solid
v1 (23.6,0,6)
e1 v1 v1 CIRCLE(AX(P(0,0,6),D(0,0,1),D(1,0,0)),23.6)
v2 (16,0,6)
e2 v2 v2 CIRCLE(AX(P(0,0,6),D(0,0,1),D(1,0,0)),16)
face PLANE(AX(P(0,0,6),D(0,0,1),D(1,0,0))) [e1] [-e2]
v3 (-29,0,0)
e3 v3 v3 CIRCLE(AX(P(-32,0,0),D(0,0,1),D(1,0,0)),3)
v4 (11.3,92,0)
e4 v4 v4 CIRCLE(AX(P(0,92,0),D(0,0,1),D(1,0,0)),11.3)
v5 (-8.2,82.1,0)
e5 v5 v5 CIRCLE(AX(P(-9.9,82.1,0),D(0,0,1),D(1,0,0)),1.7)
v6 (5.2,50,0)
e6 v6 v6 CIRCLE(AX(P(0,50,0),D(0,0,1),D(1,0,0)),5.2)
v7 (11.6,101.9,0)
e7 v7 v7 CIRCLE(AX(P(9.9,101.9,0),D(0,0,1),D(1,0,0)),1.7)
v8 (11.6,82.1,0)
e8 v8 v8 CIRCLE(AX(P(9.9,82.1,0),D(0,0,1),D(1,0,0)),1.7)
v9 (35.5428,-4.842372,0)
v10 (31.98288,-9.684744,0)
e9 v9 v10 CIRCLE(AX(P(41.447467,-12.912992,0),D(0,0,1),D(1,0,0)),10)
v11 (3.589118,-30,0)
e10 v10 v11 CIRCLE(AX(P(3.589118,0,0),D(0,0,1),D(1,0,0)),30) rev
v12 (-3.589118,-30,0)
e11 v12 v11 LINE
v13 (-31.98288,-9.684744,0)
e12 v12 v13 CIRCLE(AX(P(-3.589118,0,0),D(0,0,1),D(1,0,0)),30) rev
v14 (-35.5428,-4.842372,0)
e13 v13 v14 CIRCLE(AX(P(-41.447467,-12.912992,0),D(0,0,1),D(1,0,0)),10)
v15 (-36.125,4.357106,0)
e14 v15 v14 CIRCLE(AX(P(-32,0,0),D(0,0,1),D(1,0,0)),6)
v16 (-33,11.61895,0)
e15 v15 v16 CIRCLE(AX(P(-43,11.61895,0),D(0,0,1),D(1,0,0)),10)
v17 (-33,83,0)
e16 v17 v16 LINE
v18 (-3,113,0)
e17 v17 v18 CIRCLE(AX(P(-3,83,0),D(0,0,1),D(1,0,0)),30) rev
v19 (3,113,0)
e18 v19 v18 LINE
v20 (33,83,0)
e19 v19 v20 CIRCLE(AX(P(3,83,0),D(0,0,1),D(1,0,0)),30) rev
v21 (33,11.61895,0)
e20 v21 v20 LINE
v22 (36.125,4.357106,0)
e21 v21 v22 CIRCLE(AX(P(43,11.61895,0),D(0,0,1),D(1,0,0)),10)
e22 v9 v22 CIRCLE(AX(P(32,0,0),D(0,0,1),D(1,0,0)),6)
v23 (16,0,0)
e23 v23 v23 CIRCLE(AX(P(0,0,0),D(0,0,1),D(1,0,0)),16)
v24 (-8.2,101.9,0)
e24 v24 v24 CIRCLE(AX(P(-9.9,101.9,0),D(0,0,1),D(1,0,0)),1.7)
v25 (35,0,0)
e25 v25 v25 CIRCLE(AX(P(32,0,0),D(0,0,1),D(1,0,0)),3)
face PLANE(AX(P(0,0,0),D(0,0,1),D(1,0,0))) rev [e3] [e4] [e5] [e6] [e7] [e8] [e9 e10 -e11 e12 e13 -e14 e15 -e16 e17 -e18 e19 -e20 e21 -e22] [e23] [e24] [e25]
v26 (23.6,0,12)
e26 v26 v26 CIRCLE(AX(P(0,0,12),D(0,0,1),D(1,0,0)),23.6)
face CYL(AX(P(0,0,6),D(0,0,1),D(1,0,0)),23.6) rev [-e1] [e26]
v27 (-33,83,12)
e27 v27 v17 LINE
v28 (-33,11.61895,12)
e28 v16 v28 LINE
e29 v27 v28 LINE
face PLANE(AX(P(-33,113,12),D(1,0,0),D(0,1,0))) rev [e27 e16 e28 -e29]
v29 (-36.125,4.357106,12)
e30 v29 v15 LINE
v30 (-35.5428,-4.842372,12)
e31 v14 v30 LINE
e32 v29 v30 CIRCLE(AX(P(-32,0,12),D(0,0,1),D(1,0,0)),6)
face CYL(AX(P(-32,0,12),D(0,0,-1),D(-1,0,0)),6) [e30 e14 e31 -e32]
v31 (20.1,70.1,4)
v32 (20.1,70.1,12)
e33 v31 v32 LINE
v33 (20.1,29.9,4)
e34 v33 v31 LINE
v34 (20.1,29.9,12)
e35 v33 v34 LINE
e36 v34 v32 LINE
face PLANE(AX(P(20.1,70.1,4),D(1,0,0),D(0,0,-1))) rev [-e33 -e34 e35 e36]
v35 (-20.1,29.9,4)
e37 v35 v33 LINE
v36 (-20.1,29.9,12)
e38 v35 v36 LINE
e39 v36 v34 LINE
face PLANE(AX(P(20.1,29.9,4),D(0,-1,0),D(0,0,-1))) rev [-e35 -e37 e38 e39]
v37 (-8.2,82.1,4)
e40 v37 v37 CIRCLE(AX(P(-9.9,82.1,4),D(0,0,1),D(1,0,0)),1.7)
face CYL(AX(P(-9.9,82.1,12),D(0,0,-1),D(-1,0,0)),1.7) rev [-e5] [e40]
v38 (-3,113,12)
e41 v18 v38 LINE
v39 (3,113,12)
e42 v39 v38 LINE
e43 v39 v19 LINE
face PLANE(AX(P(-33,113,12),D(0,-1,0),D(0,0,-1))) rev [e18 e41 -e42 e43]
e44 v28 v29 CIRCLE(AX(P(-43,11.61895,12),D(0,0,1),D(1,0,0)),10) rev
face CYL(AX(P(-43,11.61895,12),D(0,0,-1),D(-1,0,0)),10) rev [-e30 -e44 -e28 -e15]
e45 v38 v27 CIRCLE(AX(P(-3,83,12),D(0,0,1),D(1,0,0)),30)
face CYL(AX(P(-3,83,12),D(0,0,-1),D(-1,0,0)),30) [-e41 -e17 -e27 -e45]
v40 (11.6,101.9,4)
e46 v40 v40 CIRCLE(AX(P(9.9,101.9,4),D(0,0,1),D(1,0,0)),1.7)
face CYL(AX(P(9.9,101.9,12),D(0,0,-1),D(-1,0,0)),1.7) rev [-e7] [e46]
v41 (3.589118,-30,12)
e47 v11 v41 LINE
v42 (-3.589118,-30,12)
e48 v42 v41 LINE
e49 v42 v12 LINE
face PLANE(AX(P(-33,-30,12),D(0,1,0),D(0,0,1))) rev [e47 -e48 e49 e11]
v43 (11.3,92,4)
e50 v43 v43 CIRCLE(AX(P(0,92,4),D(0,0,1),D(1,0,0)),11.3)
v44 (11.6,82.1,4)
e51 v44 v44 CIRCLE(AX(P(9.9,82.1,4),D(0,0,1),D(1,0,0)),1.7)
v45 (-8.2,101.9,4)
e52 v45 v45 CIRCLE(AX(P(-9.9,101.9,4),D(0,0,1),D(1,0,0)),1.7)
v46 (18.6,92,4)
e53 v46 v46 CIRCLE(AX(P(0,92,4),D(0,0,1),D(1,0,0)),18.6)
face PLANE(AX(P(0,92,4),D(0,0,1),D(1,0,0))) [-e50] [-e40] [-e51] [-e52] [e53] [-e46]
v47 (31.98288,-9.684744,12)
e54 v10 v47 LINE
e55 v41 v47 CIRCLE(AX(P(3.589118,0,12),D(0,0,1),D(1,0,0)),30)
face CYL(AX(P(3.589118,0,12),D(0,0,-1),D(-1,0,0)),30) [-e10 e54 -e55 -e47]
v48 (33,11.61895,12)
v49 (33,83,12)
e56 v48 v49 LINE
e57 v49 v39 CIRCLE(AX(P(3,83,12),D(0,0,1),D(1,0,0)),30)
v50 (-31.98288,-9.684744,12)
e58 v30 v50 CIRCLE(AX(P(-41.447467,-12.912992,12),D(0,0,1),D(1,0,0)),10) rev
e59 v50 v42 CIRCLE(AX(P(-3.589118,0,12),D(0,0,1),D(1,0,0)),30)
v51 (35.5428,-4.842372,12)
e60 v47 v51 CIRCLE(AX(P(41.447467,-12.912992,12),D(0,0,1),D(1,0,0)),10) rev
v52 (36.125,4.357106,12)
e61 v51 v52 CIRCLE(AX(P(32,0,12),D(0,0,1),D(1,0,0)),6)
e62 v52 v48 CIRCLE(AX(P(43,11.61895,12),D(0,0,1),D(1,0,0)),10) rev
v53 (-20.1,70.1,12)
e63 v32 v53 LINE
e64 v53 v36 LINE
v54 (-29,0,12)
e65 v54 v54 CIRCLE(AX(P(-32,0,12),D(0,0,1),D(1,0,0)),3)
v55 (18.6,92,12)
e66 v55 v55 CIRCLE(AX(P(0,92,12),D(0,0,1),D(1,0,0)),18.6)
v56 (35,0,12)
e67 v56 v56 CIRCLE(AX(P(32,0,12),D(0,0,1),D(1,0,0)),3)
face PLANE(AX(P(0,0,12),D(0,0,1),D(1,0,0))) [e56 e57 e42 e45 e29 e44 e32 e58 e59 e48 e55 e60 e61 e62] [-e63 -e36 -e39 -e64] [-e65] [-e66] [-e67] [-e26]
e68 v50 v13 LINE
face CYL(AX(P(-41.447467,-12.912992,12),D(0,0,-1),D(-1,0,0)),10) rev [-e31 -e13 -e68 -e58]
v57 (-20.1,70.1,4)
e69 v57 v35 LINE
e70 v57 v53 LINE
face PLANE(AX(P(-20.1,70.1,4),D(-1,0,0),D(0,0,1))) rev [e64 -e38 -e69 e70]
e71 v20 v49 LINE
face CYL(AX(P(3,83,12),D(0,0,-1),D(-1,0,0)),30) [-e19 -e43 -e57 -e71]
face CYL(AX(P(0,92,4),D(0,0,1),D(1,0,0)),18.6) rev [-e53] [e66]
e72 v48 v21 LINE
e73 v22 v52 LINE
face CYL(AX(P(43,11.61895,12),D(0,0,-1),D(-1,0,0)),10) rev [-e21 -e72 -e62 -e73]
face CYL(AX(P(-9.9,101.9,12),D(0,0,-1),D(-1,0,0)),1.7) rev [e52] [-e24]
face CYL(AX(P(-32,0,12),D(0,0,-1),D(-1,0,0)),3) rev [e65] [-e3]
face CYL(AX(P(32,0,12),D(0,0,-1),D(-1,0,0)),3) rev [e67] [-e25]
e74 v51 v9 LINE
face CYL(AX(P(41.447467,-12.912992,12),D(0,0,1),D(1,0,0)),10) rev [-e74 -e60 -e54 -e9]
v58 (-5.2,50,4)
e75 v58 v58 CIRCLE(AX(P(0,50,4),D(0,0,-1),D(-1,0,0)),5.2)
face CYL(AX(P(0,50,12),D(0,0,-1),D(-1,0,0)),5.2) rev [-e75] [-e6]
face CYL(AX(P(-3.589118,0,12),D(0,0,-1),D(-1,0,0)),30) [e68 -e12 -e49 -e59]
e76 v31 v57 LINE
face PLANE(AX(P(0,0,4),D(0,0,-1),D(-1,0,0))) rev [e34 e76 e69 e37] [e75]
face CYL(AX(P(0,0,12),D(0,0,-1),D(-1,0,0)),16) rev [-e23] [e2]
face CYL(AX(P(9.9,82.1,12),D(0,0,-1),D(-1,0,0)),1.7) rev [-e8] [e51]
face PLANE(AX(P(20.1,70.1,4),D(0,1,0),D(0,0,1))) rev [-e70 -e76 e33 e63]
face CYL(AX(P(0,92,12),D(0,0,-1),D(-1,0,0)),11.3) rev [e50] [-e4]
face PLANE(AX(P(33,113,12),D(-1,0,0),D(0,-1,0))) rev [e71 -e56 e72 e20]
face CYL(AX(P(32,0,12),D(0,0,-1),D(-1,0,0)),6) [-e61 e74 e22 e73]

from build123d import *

# Parameters (mm, degrees)
SKETCH1_W           = 66
SKETCH1_H           = 143
SKETCH1_R           = 16
SKETCH1_R_2         = 5.2
SKETCH1_R_3         = 11.3
SKETCH1_R_4         = 1.7
BOSS_EXTRUDE1_DEPTH = 12
SKETCH3_R           = 18.6
SKETCH3_W           = 40.2
SKETCH3_H           = 40.2
CUT_EXTRUDE1_DEPTH  = 8
SKETCH4_R           = 23.6
CUT_EXTRUDE2_DEPTH  = 6
SKETCH5_R           = 6
BOSS_EXTRUDE2_DEPTH = 12
SKETCH5_3_R         = 3
CUT_EXTRUDE3_DEPTH  = 120.82069938
FILLET1_R           = 30
VERRUNDUNG1_R       = 10


with BuildPart() as part:
    # Sketch1 → Boss-Extrude1 (new body)
    with BuildSketch(Plane.XY):
        with Locations((0, 41.5)):
            Rectangle(SKETCH1_W, SKETCH1_H)
        Circle(SKETCH1_R, mode=Mode.SUBTRACT)
        with Locations((0, 50)):
            Circle(SKETCH1_R_2, mode=Mode.SUBTRACT)
        with Locations((0, 92)):
            Circle(SKETCH1_R_3, mode=Mode.SUBTRACT)
        with Locations((-9.9, 101.9)):
            Circle(SKETCH1_R_4, mode=Mode.SUBTRACT)
        with Locations((9.9, 101.9)):
            Circle(SKETCH1_R_4, mode=Mode.SUBTRACT)
        with Locations((9.9, 82.1)):
            Circle(SKETCH1_R_4, mode=Mode.SUBTRACT)
        with Locations((-9.9, 82.1)):
            Circle(SKETCH1_R_4, mode=Mode.SUBTRACT)
    extrude(amount=BOSS_EXTRUDE1_DEPTH)

    # Sketch3 → Cut-Extrude1 (cut)
    with BuildSketch(Plane.XY.offset(12)):
        with Locations((0, 92)):
            Circle(SKETCH3_R)
        with Locations((0, 50)):
            Rectangle(SKETCH3_W, SKETCH3_H)
    extrude(amount=-CUT_EXTRUDE1_DEPTH, mode=Mode.SUBTRACT)

    # Sketch4 → Cut-Extrude2 (cut)
    with BuildSketch(Plane.XY.offset(12)):
        Circle(SKETCH4_R)
    extrude(amount=-CUT_EXTRUDE2_DEPTH, mode=Mode.SUBTRACT)

    # Sketch5 → Boss-Extrude2 (add)
    with BuildSketch(Plane.XY):
        with Locations((-32, 0)):
            Circle(SKETCH5_R)
        with Locations((32, 0)):
            Circle(SKETCH5_R)
    extrude(amount=BOSS_EXTRUDE2_DEPTH)

    # Sketch5<3> → Cut-Extrude3 (cut, through all)
    with BuildSketch(Plane.XY):
        with Locations((32, 0)):
            Circle(SKETCH5_3_R)
        with Locations((-32, 0)):
            Circle(SKETCH5_3_R)
    extrude(amount=CUT_EXTRUDE3_DEPTH, mode=Mode.SUBTRACT)

    # Fillet1
    # the kernel refuses this fillet: 30 mm, written as the material it takes off along each edge
    with BuildSketch(Plane(origin=(-33, 113, -75), x_dir=(1, 0, 0), z_dir=(0, 0, 1))) as fillet1_piece_1:
        with BuildLine():
            CenterArc((FILLET1_R, -FILLET1_R), FILLET1_R, 90, 90)
            Line((0, -FILLET1_R), (-FILLET1_R * 0.02, -FILLET1_R))
            Line((-FILLET1_R * 0.02, -FILLET1_R), (-FILLET1_R * 0.02, FILLET1_R * 0.02))
            Line((-FILLET1_R * 0.02, FILLET1_R * 0.02), (FILLET1_R, FILLET1_R * 0.02))
            Line((FILLET1_R, FILLET1_R * 0.02), (FILLET1_R, 0))
        make_face()
    extrude(amount=162, mode=Mode.SUBTRACT)
    with BuildSketch(Plane(origin=(33, 113, -75), x_dir=(-1, 0, 0), z_dir=(0, 0, 1))) as fillet1_piece_2:
        with BuildLine():
            CenterArc((FILLET1_R, FILLET1_R), FILLET1_R, 180, 90)
            Line((0, FILLET1_R), (-FILLET1_R * 0.02, FILLET1_R))
            Line((-FILLET1_R * 0.02, FILLET1_R), (-FILLET1_R * 0.02, -FILLET1_R * 0.02))
            Line((-FILLET1_R * 0.02, -FILLET1_R * 0.02), (FILLET1_R, -FILLET1_R * 0.02))
            Line((FILLET1_R, -FILLET1_R * 0.02), (FILLET1_R, 0))
        make_face()
    extrude(amount=162, mode=Mode.SUBTRACT)
    with BuildSketch(Plane(origin=(33, -30, -73.527205849), x_dir=(-1, 0, 0), z_dir=(0, 0, 1))) as fillet1_piece_3:
        with BuildLine():
            CenterArc((29.41088234, -30), FILLET1_R, 90, 78.626574363)
            Line((0, -24.083920217), (-0.588217647, -23.965598621))
            ThreePointArc((-0.588217647, -23.965598621), (-0.6, -12.041960108), (-0.6, 0))
            Line((-0.6, 0), (0, 0.6))
            Line((0, 0.6), (29.41088234, 0.6))
            Line((29.41088234, 0.6), (29.41088234, 0))
        make_face()
    extrude(amount=159.054411699, mode=Mode.SUBTRACT)
    with BuildSketch(Plane(origin=(-33, -30, -73.527205849), x_dir=(0, 1, 0), z_dir=(0, 0, 1))) as fillet1_piece_4:
        with BuildLine():
            CenterArc((30, -29.41088234), FILLET1_R, 101.373425637, 78.626574363)
            Line((0, -29.41088234), (-0.6, -29.41088234))
            Line((-0.6, -29.41088234), (-0.6, 0))
            Line((-0.6, 0), (0, 0.6))
            ThreePointArc((0, 0.6), (12.041960108, 0.6), (23.965598621, 0.588217647))
            Line((23.965598621, 0.588217647), (24.083920217, 0))
        make_face()
    extrude(amount=159.054411699, mode=Mode.SUBTRACT)

    # Verrundung1
    verrundung1_edges = [part.edges().sort_by_distance(p)[0] for p in [
        (-33, 5.916079783, 6),
        (-33, -5.916079783, 6),
        (33, -5.916079783, 6),
        (33, 5.916079783, 6),
    ]]
    fillet(verrundung1_edges, radius=VERRUNDUNG1_R)


solid = part.part
